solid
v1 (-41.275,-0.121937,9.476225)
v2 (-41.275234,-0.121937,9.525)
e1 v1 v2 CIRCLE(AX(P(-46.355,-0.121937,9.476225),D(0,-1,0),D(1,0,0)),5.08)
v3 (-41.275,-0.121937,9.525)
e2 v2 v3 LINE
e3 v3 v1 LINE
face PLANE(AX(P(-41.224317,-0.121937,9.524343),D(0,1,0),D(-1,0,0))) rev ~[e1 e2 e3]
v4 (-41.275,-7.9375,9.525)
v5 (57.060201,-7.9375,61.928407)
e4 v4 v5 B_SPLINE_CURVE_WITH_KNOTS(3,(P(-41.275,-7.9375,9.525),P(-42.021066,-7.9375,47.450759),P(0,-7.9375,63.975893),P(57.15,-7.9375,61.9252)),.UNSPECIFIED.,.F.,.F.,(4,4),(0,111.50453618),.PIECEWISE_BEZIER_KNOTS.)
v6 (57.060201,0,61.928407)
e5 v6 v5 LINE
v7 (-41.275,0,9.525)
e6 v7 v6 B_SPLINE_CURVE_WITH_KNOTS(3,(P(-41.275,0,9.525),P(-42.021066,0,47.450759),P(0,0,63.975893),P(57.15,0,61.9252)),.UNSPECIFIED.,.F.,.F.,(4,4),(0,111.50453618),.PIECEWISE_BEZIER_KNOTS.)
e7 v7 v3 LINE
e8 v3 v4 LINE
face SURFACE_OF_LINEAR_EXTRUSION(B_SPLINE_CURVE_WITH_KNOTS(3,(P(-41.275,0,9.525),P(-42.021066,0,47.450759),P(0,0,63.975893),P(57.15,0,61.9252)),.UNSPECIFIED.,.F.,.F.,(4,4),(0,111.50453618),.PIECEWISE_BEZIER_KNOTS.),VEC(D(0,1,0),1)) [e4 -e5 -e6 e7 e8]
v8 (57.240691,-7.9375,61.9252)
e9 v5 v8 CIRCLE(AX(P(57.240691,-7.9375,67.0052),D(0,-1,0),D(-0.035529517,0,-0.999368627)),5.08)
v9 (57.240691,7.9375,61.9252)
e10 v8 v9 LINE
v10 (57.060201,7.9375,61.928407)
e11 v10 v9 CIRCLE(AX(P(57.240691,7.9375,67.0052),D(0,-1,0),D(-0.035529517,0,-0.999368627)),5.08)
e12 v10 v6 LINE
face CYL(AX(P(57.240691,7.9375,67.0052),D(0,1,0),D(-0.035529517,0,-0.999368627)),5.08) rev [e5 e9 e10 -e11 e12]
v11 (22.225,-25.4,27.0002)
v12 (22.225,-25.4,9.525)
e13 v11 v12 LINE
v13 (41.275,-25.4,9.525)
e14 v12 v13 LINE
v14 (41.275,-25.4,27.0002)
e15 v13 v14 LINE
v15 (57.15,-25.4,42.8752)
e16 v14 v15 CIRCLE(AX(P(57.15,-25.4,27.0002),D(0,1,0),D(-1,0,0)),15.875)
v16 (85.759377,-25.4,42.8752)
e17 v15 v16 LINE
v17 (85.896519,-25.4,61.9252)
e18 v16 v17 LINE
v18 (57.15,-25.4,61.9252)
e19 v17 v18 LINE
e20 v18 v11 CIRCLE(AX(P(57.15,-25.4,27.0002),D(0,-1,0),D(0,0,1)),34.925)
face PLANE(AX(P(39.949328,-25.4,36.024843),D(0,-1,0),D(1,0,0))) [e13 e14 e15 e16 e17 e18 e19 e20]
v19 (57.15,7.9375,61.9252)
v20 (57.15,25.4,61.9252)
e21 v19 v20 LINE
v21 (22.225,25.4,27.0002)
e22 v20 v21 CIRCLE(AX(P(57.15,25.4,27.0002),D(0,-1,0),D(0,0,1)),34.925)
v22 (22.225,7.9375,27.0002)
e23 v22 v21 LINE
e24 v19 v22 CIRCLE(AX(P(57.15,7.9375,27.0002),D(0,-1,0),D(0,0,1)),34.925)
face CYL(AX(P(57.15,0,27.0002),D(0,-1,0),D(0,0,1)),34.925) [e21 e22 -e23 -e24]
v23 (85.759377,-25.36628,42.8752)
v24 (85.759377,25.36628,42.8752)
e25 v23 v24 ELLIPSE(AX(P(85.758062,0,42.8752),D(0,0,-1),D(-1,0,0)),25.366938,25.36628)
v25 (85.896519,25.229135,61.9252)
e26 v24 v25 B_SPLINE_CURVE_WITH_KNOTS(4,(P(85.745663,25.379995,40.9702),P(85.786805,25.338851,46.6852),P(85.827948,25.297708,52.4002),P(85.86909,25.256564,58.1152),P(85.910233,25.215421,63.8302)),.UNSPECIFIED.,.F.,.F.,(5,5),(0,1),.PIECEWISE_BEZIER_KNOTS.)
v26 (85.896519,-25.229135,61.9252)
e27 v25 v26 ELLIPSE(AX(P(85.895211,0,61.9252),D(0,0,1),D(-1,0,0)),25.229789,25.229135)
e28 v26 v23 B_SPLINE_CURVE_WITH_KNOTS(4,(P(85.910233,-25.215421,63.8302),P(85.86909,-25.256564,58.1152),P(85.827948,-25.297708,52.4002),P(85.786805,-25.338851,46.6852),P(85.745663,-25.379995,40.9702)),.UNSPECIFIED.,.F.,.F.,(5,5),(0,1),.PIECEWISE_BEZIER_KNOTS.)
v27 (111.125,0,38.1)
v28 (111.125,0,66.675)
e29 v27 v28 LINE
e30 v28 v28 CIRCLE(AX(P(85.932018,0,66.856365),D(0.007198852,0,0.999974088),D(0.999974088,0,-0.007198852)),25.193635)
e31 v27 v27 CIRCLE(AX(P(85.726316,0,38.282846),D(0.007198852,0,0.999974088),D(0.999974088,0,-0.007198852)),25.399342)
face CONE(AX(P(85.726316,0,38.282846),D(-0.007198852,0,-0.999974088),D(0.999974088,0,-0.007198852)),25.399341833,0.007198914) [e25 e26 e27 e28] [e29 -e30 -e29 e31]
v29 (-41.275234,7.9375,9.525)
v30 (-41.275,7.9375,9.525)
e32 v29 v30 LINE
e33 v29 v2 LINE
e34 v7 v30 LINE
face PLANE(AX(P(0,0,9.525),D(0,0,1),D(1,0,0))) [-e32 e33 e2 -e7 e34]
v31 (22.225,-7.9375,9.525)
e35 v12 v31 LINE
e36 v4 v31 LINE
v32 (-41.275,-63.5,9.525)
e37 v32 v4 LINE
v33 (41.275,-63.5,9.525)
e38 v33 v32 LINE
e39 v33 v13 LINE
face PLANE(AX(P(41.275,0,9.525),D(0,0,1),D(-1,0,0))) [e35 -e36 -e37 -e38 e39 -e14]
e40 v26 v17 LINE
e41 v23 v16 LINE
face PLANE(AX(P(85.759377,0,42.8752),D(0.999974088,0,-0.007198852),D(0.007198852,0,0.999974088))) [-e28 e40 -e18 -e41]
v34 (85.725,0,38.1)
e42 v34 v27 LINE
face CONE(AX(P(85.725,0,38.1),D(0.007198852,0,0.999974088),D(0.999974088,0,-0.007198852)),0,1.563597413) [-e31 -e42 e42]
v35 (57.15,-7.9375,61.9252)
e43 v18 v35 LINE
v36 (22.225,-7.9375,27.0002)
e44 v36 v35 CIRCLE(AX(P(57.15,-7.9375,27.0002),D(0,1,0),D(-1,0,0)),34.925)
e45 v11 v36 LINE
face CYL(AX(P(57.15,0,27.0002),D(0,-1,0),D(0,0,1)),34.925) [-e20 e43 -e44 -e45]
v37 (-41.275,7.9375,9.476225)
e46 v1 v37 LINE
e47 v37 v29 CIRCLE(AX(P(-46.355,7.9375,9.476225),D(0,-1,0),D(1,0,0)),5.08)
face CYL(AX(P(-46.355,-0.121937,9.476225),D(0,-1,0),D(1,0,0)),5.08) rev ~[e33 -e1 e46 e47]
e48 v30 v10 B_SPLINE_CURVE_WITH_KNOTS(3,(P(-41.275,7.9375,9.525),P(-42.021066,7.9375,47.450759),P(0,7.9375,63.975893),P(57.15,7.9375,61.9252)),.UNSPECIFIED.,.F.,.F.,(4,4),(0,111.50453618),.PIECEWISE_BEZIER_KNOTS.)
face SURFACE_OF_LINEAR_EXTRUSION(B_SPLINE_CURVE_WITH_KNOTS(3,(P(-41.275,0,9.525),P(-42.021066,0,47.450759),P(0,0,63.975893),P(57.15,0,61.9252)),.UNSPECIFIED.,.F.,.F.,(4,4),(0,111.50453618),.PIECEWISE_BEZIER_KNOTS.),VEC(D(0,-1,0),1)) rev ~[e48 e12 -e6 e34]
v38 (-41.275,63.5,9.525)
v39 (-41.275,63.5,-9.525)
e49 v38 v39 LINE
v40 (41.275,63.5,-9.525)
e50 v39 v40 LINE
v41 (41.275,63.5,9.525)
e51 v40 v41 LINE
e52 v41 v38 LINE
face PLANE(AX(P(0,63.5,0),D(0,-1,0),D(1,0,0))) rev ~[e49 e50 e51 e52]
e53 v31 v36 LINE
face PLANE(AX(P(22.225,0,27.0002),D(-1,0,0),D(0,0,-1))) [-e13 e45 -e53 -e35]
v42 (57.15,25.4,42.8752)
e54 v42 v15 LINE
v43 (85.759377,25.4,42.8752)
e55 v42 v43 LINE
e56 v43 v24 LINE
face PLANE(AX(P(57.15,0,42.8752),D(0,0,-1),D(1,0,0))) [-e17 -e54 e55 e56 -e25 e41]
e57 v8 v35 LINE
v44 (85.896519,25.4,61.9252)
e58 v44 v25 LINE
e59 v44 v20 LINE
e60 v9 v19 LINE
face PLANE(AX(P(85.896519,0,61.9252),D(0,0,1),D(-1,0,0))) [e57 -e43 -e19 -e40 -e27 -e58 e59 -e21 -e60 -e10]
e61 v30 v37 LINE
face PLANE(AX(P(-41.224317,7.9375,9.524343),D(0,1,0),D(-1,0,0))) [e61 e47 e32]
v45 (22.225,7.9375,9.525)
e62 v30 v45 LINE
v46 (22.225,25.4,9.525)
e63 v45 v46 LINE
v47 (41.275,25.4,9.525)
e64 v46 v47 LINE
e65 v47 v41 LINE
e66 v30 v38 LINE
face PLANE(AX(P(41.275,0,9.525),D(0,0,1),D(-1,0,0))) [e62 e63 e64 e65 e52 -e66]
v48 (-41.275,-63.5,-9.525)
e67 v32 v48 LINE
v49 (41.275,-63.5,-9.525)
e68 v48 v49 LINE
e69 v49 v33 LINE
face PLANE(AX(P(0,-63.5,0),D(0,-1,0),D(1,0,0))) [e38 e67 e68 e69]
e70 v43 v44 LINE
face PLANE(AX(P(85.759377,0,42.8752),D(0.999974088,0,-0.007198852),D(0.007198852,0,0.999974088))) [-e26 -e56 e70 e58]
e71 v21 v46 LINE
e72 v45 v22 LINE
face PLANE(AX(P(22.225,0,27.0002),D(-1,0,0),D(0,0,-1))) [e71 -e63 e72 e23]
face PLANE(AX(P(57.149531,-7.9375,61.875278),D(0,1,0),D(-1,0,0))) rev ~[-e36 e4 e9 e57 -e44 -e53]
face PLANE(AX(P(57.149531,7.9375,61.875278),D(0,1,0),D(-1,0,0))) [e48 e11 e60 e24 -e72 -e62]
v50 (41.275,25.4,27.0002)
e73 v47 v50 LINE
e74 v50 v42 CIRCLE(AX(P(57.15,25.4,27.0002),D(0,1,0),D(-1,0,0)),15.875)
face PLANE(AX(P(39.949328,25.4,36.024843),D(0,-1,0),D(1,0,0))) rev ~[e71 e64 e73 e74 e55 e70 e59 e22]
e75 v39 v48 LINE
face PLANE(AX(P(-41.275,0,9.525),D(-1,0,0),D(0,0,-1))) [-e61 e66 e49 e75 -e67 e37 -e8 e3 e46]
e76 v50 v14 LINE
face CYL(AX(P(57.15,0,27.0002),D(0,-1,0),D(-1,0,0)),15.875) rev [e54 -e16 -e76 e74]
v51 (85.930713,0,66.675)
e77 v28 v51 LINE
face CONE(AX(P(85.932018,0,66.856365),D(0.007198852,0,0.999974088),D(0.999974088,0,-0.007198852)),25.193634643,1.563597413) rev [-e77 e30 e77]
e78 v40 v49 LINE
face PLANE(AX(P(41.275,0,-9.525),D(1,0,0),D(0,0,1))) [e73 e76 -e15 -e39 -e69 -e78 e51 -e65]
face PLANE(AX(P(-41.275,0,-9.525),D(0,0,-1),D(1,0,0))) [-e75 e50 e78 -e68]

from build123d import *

# Parameters (mm, degrees)
F1_DEPTH    = 63.5
F2_DEPTH    = 25.4
F3_DEPTH    = 7.9375
F5_T1_DEPTH = 7.9375
F5_T3_DEPTH = 7.9375
F5_T8_DEPTH = 8.0594365629


# Not quite as in the source:
# - a fillet or chamfer that OpenCascade refuses, or shapes differently, is made with other operations: its cross-section is extruded or revolved along the edge and cut away or added


with BuildPart() as f1:
    # F0 (on Front) → F1 (new body, symmetric)
    with BuildSketch(Plane.XZ):
        Polygon((-41.275, 9.525), (-41.275, -9.525), (41.275, -9.525), (41.275, 9.525), (22.2249999642, 9.525), align=None)
    extrude(amount=F1_DEPTH, both=True)

    # F0 (on Front) → F2 (join, symmetric)
    with BuildSketch(Plane.XZ):
        with BuildLine():
            Line((22.2249999642, 9.525), (41.275, 9.525))
            Line((41.275, 9.525), (41.275, 27.0002))
            ThreePointArc((41.275, 27.0002), (45.9246798487, 38.2255201513), (57.15, 42.8752))
            Line((57.15, 42.8752), (60.325, 42.8752))
            Line((60.325, 42.8752), (60.325, 61.9252000358))
            Line((60.325, 61.9252000358), (57.15, 61.9252000358))
            ThreePointArc((57.15, 61.9252000358), (32.4542956418, 51.6959043582), (22.2249999642, 27.0002))
            Line((22.2249999642, 27.0002), (22.2249999642, 9.525))
        make_face()
        Polygon((85.8965185289, 61.9252000358), (60.325, 61.9252000358), (60.325, 42.8752), (85.759376848, 42.8752), align=None)
    extrude(amount=F2_DEPTH, both=True)

    # F0 (on Front) → F3 (join, symmetric)
    with BuildSketch(Plane.XZ):
        with BuildLine():
            add(Edge.make_bspline(
                [(-41.275, 9.525), (-42.0210659504, 47.4507585168), (0, 63.975892961), (57.15, 61.9252000358)],
                knots=[0, 0, 0, 0, 111.5045361803, 111.5045361803, 111.5045361803, 111.5045361803], degree=3))
            Line((-41.275, 9.525), (22.2249999642, 9.525))
            Line((22.2249999642, 9.525), (22.2249999642, 27.0002))
            ThreePointArc((22.2249999642, 27.0002), (32.4542956418, 51.6959043582), (57.15, 61.9252000358))
        make_face()
    extrude(amount=F3_DEPTH, both=True)

    # F0 (on Front) → F4 (revolve)
    with BuildSketch(Plane.XZ):
        Polygon((85.9307125211, 66.675), (85.8965185289, 61.9252000358), (85.759376848, 42.8752), (85.725, 38.1), (111.125, 38.1), (111.125, 66.675), align=None)
    revolve(axis=Axis((85.8278562605, 0, 52.3875), (0.0071988518, 0, 0.9999740879)))

    # F5: fillet of radius 5.08 on 6 edges, made by hand

    # F5_s2 → F5_t1 (join)
    with BuildSketch(Plane.XZ):
        with BuildLine():
            ThreePointArc((57.0602012116, 61.9284074084), (57.1504319335, 61.9260019422), (57.2406911513, 61.9252000358))
            Line((57.2406911513, 61.9252000358), (57.2406911513, 61.8236000358))
            Line((57.2406911513, 61.8236000358), (57.15, 61.8236000358))
            Line((57.15, 61.8236000358), (57.1463566684, 61.8236653809))
            ThreePointArc((57.1463566684, 61.8236653809), (57.1014741691, 61.8252721742), (57.0565914128, 61.8268715558))
            Line((57.0565914128, 61.8268715558), (57.0602012116, 61.9284074084))
        make_face()
    extrude(amount=F5_T1_DEPTH)

    # F5_s4 → F5_t3 (join)
    with BuildSketch(Plane.XZ.offset(-7.9375)):
        with BuildLine():
            ThreePointArc((57.0602012116, 61.9284074084), (57.1504319335, 61.9260019422), (57.2406911513, 61.9252000358))
            Line((57.2406911513, 61.9252000358), (57.2406911513, 61.8236000358))
            Line((57.2406911513, 61.8236000358), (57.15, 61.8236000358))
            Line((57.15, 61.8236000358), (57.1463566684, 61.8236653809))
            ThreePointArc((57.1463566684, 61.8236653809), (57.1014741691, 61.8252721742), (57.0565914128, 61.8268715558))
            Line((57.0565914128, 61.8268715558), (57.0602012116, 61.9284074084))
        make_face()
    extrude(amount=F5_T3_DEPTH)


with BuildPart() as f5_tool6:
    # F5_s7 → F5_t8 (new body)
    with BuildSketch(Plane.XZ.offset(0.1219365629)):
        with BuildLine():
            ThreePointArc((-41.275, 9.4762253748), (-41.2752233916, 9.5238657859), (-41.2758935468, 9.5715020071))
            Line((-41.2758935468, 9.5715020071), (-41.1743114177, 9.5734075397))
            ThreePointArc((-41.1743114177, 9.5734075397), (-41.1738708312, 9.5502028132), (-41.1734196528, 9.526998263))
            Line((-41.1734196528, 9.526998263), (-41.1734, 9.525))
            Line((-41.1734, 9.525), (-41.1734, 9.4762253748))
            Line((-41.1734, 9.4762253748), (-41.275, 9.4762253748))
        make_face()
    extrude(amount=-F5_T8_DEPTH)

    split(bisect_by=Plane.XY.offset(9.525), keep=Keep.BOTTOM)


with BuildPart() as f1_1:
    add(f1.part)

    # F5_t5: union F5_tool6
    add(f5_tool6.part)


solid = f1_1.part
